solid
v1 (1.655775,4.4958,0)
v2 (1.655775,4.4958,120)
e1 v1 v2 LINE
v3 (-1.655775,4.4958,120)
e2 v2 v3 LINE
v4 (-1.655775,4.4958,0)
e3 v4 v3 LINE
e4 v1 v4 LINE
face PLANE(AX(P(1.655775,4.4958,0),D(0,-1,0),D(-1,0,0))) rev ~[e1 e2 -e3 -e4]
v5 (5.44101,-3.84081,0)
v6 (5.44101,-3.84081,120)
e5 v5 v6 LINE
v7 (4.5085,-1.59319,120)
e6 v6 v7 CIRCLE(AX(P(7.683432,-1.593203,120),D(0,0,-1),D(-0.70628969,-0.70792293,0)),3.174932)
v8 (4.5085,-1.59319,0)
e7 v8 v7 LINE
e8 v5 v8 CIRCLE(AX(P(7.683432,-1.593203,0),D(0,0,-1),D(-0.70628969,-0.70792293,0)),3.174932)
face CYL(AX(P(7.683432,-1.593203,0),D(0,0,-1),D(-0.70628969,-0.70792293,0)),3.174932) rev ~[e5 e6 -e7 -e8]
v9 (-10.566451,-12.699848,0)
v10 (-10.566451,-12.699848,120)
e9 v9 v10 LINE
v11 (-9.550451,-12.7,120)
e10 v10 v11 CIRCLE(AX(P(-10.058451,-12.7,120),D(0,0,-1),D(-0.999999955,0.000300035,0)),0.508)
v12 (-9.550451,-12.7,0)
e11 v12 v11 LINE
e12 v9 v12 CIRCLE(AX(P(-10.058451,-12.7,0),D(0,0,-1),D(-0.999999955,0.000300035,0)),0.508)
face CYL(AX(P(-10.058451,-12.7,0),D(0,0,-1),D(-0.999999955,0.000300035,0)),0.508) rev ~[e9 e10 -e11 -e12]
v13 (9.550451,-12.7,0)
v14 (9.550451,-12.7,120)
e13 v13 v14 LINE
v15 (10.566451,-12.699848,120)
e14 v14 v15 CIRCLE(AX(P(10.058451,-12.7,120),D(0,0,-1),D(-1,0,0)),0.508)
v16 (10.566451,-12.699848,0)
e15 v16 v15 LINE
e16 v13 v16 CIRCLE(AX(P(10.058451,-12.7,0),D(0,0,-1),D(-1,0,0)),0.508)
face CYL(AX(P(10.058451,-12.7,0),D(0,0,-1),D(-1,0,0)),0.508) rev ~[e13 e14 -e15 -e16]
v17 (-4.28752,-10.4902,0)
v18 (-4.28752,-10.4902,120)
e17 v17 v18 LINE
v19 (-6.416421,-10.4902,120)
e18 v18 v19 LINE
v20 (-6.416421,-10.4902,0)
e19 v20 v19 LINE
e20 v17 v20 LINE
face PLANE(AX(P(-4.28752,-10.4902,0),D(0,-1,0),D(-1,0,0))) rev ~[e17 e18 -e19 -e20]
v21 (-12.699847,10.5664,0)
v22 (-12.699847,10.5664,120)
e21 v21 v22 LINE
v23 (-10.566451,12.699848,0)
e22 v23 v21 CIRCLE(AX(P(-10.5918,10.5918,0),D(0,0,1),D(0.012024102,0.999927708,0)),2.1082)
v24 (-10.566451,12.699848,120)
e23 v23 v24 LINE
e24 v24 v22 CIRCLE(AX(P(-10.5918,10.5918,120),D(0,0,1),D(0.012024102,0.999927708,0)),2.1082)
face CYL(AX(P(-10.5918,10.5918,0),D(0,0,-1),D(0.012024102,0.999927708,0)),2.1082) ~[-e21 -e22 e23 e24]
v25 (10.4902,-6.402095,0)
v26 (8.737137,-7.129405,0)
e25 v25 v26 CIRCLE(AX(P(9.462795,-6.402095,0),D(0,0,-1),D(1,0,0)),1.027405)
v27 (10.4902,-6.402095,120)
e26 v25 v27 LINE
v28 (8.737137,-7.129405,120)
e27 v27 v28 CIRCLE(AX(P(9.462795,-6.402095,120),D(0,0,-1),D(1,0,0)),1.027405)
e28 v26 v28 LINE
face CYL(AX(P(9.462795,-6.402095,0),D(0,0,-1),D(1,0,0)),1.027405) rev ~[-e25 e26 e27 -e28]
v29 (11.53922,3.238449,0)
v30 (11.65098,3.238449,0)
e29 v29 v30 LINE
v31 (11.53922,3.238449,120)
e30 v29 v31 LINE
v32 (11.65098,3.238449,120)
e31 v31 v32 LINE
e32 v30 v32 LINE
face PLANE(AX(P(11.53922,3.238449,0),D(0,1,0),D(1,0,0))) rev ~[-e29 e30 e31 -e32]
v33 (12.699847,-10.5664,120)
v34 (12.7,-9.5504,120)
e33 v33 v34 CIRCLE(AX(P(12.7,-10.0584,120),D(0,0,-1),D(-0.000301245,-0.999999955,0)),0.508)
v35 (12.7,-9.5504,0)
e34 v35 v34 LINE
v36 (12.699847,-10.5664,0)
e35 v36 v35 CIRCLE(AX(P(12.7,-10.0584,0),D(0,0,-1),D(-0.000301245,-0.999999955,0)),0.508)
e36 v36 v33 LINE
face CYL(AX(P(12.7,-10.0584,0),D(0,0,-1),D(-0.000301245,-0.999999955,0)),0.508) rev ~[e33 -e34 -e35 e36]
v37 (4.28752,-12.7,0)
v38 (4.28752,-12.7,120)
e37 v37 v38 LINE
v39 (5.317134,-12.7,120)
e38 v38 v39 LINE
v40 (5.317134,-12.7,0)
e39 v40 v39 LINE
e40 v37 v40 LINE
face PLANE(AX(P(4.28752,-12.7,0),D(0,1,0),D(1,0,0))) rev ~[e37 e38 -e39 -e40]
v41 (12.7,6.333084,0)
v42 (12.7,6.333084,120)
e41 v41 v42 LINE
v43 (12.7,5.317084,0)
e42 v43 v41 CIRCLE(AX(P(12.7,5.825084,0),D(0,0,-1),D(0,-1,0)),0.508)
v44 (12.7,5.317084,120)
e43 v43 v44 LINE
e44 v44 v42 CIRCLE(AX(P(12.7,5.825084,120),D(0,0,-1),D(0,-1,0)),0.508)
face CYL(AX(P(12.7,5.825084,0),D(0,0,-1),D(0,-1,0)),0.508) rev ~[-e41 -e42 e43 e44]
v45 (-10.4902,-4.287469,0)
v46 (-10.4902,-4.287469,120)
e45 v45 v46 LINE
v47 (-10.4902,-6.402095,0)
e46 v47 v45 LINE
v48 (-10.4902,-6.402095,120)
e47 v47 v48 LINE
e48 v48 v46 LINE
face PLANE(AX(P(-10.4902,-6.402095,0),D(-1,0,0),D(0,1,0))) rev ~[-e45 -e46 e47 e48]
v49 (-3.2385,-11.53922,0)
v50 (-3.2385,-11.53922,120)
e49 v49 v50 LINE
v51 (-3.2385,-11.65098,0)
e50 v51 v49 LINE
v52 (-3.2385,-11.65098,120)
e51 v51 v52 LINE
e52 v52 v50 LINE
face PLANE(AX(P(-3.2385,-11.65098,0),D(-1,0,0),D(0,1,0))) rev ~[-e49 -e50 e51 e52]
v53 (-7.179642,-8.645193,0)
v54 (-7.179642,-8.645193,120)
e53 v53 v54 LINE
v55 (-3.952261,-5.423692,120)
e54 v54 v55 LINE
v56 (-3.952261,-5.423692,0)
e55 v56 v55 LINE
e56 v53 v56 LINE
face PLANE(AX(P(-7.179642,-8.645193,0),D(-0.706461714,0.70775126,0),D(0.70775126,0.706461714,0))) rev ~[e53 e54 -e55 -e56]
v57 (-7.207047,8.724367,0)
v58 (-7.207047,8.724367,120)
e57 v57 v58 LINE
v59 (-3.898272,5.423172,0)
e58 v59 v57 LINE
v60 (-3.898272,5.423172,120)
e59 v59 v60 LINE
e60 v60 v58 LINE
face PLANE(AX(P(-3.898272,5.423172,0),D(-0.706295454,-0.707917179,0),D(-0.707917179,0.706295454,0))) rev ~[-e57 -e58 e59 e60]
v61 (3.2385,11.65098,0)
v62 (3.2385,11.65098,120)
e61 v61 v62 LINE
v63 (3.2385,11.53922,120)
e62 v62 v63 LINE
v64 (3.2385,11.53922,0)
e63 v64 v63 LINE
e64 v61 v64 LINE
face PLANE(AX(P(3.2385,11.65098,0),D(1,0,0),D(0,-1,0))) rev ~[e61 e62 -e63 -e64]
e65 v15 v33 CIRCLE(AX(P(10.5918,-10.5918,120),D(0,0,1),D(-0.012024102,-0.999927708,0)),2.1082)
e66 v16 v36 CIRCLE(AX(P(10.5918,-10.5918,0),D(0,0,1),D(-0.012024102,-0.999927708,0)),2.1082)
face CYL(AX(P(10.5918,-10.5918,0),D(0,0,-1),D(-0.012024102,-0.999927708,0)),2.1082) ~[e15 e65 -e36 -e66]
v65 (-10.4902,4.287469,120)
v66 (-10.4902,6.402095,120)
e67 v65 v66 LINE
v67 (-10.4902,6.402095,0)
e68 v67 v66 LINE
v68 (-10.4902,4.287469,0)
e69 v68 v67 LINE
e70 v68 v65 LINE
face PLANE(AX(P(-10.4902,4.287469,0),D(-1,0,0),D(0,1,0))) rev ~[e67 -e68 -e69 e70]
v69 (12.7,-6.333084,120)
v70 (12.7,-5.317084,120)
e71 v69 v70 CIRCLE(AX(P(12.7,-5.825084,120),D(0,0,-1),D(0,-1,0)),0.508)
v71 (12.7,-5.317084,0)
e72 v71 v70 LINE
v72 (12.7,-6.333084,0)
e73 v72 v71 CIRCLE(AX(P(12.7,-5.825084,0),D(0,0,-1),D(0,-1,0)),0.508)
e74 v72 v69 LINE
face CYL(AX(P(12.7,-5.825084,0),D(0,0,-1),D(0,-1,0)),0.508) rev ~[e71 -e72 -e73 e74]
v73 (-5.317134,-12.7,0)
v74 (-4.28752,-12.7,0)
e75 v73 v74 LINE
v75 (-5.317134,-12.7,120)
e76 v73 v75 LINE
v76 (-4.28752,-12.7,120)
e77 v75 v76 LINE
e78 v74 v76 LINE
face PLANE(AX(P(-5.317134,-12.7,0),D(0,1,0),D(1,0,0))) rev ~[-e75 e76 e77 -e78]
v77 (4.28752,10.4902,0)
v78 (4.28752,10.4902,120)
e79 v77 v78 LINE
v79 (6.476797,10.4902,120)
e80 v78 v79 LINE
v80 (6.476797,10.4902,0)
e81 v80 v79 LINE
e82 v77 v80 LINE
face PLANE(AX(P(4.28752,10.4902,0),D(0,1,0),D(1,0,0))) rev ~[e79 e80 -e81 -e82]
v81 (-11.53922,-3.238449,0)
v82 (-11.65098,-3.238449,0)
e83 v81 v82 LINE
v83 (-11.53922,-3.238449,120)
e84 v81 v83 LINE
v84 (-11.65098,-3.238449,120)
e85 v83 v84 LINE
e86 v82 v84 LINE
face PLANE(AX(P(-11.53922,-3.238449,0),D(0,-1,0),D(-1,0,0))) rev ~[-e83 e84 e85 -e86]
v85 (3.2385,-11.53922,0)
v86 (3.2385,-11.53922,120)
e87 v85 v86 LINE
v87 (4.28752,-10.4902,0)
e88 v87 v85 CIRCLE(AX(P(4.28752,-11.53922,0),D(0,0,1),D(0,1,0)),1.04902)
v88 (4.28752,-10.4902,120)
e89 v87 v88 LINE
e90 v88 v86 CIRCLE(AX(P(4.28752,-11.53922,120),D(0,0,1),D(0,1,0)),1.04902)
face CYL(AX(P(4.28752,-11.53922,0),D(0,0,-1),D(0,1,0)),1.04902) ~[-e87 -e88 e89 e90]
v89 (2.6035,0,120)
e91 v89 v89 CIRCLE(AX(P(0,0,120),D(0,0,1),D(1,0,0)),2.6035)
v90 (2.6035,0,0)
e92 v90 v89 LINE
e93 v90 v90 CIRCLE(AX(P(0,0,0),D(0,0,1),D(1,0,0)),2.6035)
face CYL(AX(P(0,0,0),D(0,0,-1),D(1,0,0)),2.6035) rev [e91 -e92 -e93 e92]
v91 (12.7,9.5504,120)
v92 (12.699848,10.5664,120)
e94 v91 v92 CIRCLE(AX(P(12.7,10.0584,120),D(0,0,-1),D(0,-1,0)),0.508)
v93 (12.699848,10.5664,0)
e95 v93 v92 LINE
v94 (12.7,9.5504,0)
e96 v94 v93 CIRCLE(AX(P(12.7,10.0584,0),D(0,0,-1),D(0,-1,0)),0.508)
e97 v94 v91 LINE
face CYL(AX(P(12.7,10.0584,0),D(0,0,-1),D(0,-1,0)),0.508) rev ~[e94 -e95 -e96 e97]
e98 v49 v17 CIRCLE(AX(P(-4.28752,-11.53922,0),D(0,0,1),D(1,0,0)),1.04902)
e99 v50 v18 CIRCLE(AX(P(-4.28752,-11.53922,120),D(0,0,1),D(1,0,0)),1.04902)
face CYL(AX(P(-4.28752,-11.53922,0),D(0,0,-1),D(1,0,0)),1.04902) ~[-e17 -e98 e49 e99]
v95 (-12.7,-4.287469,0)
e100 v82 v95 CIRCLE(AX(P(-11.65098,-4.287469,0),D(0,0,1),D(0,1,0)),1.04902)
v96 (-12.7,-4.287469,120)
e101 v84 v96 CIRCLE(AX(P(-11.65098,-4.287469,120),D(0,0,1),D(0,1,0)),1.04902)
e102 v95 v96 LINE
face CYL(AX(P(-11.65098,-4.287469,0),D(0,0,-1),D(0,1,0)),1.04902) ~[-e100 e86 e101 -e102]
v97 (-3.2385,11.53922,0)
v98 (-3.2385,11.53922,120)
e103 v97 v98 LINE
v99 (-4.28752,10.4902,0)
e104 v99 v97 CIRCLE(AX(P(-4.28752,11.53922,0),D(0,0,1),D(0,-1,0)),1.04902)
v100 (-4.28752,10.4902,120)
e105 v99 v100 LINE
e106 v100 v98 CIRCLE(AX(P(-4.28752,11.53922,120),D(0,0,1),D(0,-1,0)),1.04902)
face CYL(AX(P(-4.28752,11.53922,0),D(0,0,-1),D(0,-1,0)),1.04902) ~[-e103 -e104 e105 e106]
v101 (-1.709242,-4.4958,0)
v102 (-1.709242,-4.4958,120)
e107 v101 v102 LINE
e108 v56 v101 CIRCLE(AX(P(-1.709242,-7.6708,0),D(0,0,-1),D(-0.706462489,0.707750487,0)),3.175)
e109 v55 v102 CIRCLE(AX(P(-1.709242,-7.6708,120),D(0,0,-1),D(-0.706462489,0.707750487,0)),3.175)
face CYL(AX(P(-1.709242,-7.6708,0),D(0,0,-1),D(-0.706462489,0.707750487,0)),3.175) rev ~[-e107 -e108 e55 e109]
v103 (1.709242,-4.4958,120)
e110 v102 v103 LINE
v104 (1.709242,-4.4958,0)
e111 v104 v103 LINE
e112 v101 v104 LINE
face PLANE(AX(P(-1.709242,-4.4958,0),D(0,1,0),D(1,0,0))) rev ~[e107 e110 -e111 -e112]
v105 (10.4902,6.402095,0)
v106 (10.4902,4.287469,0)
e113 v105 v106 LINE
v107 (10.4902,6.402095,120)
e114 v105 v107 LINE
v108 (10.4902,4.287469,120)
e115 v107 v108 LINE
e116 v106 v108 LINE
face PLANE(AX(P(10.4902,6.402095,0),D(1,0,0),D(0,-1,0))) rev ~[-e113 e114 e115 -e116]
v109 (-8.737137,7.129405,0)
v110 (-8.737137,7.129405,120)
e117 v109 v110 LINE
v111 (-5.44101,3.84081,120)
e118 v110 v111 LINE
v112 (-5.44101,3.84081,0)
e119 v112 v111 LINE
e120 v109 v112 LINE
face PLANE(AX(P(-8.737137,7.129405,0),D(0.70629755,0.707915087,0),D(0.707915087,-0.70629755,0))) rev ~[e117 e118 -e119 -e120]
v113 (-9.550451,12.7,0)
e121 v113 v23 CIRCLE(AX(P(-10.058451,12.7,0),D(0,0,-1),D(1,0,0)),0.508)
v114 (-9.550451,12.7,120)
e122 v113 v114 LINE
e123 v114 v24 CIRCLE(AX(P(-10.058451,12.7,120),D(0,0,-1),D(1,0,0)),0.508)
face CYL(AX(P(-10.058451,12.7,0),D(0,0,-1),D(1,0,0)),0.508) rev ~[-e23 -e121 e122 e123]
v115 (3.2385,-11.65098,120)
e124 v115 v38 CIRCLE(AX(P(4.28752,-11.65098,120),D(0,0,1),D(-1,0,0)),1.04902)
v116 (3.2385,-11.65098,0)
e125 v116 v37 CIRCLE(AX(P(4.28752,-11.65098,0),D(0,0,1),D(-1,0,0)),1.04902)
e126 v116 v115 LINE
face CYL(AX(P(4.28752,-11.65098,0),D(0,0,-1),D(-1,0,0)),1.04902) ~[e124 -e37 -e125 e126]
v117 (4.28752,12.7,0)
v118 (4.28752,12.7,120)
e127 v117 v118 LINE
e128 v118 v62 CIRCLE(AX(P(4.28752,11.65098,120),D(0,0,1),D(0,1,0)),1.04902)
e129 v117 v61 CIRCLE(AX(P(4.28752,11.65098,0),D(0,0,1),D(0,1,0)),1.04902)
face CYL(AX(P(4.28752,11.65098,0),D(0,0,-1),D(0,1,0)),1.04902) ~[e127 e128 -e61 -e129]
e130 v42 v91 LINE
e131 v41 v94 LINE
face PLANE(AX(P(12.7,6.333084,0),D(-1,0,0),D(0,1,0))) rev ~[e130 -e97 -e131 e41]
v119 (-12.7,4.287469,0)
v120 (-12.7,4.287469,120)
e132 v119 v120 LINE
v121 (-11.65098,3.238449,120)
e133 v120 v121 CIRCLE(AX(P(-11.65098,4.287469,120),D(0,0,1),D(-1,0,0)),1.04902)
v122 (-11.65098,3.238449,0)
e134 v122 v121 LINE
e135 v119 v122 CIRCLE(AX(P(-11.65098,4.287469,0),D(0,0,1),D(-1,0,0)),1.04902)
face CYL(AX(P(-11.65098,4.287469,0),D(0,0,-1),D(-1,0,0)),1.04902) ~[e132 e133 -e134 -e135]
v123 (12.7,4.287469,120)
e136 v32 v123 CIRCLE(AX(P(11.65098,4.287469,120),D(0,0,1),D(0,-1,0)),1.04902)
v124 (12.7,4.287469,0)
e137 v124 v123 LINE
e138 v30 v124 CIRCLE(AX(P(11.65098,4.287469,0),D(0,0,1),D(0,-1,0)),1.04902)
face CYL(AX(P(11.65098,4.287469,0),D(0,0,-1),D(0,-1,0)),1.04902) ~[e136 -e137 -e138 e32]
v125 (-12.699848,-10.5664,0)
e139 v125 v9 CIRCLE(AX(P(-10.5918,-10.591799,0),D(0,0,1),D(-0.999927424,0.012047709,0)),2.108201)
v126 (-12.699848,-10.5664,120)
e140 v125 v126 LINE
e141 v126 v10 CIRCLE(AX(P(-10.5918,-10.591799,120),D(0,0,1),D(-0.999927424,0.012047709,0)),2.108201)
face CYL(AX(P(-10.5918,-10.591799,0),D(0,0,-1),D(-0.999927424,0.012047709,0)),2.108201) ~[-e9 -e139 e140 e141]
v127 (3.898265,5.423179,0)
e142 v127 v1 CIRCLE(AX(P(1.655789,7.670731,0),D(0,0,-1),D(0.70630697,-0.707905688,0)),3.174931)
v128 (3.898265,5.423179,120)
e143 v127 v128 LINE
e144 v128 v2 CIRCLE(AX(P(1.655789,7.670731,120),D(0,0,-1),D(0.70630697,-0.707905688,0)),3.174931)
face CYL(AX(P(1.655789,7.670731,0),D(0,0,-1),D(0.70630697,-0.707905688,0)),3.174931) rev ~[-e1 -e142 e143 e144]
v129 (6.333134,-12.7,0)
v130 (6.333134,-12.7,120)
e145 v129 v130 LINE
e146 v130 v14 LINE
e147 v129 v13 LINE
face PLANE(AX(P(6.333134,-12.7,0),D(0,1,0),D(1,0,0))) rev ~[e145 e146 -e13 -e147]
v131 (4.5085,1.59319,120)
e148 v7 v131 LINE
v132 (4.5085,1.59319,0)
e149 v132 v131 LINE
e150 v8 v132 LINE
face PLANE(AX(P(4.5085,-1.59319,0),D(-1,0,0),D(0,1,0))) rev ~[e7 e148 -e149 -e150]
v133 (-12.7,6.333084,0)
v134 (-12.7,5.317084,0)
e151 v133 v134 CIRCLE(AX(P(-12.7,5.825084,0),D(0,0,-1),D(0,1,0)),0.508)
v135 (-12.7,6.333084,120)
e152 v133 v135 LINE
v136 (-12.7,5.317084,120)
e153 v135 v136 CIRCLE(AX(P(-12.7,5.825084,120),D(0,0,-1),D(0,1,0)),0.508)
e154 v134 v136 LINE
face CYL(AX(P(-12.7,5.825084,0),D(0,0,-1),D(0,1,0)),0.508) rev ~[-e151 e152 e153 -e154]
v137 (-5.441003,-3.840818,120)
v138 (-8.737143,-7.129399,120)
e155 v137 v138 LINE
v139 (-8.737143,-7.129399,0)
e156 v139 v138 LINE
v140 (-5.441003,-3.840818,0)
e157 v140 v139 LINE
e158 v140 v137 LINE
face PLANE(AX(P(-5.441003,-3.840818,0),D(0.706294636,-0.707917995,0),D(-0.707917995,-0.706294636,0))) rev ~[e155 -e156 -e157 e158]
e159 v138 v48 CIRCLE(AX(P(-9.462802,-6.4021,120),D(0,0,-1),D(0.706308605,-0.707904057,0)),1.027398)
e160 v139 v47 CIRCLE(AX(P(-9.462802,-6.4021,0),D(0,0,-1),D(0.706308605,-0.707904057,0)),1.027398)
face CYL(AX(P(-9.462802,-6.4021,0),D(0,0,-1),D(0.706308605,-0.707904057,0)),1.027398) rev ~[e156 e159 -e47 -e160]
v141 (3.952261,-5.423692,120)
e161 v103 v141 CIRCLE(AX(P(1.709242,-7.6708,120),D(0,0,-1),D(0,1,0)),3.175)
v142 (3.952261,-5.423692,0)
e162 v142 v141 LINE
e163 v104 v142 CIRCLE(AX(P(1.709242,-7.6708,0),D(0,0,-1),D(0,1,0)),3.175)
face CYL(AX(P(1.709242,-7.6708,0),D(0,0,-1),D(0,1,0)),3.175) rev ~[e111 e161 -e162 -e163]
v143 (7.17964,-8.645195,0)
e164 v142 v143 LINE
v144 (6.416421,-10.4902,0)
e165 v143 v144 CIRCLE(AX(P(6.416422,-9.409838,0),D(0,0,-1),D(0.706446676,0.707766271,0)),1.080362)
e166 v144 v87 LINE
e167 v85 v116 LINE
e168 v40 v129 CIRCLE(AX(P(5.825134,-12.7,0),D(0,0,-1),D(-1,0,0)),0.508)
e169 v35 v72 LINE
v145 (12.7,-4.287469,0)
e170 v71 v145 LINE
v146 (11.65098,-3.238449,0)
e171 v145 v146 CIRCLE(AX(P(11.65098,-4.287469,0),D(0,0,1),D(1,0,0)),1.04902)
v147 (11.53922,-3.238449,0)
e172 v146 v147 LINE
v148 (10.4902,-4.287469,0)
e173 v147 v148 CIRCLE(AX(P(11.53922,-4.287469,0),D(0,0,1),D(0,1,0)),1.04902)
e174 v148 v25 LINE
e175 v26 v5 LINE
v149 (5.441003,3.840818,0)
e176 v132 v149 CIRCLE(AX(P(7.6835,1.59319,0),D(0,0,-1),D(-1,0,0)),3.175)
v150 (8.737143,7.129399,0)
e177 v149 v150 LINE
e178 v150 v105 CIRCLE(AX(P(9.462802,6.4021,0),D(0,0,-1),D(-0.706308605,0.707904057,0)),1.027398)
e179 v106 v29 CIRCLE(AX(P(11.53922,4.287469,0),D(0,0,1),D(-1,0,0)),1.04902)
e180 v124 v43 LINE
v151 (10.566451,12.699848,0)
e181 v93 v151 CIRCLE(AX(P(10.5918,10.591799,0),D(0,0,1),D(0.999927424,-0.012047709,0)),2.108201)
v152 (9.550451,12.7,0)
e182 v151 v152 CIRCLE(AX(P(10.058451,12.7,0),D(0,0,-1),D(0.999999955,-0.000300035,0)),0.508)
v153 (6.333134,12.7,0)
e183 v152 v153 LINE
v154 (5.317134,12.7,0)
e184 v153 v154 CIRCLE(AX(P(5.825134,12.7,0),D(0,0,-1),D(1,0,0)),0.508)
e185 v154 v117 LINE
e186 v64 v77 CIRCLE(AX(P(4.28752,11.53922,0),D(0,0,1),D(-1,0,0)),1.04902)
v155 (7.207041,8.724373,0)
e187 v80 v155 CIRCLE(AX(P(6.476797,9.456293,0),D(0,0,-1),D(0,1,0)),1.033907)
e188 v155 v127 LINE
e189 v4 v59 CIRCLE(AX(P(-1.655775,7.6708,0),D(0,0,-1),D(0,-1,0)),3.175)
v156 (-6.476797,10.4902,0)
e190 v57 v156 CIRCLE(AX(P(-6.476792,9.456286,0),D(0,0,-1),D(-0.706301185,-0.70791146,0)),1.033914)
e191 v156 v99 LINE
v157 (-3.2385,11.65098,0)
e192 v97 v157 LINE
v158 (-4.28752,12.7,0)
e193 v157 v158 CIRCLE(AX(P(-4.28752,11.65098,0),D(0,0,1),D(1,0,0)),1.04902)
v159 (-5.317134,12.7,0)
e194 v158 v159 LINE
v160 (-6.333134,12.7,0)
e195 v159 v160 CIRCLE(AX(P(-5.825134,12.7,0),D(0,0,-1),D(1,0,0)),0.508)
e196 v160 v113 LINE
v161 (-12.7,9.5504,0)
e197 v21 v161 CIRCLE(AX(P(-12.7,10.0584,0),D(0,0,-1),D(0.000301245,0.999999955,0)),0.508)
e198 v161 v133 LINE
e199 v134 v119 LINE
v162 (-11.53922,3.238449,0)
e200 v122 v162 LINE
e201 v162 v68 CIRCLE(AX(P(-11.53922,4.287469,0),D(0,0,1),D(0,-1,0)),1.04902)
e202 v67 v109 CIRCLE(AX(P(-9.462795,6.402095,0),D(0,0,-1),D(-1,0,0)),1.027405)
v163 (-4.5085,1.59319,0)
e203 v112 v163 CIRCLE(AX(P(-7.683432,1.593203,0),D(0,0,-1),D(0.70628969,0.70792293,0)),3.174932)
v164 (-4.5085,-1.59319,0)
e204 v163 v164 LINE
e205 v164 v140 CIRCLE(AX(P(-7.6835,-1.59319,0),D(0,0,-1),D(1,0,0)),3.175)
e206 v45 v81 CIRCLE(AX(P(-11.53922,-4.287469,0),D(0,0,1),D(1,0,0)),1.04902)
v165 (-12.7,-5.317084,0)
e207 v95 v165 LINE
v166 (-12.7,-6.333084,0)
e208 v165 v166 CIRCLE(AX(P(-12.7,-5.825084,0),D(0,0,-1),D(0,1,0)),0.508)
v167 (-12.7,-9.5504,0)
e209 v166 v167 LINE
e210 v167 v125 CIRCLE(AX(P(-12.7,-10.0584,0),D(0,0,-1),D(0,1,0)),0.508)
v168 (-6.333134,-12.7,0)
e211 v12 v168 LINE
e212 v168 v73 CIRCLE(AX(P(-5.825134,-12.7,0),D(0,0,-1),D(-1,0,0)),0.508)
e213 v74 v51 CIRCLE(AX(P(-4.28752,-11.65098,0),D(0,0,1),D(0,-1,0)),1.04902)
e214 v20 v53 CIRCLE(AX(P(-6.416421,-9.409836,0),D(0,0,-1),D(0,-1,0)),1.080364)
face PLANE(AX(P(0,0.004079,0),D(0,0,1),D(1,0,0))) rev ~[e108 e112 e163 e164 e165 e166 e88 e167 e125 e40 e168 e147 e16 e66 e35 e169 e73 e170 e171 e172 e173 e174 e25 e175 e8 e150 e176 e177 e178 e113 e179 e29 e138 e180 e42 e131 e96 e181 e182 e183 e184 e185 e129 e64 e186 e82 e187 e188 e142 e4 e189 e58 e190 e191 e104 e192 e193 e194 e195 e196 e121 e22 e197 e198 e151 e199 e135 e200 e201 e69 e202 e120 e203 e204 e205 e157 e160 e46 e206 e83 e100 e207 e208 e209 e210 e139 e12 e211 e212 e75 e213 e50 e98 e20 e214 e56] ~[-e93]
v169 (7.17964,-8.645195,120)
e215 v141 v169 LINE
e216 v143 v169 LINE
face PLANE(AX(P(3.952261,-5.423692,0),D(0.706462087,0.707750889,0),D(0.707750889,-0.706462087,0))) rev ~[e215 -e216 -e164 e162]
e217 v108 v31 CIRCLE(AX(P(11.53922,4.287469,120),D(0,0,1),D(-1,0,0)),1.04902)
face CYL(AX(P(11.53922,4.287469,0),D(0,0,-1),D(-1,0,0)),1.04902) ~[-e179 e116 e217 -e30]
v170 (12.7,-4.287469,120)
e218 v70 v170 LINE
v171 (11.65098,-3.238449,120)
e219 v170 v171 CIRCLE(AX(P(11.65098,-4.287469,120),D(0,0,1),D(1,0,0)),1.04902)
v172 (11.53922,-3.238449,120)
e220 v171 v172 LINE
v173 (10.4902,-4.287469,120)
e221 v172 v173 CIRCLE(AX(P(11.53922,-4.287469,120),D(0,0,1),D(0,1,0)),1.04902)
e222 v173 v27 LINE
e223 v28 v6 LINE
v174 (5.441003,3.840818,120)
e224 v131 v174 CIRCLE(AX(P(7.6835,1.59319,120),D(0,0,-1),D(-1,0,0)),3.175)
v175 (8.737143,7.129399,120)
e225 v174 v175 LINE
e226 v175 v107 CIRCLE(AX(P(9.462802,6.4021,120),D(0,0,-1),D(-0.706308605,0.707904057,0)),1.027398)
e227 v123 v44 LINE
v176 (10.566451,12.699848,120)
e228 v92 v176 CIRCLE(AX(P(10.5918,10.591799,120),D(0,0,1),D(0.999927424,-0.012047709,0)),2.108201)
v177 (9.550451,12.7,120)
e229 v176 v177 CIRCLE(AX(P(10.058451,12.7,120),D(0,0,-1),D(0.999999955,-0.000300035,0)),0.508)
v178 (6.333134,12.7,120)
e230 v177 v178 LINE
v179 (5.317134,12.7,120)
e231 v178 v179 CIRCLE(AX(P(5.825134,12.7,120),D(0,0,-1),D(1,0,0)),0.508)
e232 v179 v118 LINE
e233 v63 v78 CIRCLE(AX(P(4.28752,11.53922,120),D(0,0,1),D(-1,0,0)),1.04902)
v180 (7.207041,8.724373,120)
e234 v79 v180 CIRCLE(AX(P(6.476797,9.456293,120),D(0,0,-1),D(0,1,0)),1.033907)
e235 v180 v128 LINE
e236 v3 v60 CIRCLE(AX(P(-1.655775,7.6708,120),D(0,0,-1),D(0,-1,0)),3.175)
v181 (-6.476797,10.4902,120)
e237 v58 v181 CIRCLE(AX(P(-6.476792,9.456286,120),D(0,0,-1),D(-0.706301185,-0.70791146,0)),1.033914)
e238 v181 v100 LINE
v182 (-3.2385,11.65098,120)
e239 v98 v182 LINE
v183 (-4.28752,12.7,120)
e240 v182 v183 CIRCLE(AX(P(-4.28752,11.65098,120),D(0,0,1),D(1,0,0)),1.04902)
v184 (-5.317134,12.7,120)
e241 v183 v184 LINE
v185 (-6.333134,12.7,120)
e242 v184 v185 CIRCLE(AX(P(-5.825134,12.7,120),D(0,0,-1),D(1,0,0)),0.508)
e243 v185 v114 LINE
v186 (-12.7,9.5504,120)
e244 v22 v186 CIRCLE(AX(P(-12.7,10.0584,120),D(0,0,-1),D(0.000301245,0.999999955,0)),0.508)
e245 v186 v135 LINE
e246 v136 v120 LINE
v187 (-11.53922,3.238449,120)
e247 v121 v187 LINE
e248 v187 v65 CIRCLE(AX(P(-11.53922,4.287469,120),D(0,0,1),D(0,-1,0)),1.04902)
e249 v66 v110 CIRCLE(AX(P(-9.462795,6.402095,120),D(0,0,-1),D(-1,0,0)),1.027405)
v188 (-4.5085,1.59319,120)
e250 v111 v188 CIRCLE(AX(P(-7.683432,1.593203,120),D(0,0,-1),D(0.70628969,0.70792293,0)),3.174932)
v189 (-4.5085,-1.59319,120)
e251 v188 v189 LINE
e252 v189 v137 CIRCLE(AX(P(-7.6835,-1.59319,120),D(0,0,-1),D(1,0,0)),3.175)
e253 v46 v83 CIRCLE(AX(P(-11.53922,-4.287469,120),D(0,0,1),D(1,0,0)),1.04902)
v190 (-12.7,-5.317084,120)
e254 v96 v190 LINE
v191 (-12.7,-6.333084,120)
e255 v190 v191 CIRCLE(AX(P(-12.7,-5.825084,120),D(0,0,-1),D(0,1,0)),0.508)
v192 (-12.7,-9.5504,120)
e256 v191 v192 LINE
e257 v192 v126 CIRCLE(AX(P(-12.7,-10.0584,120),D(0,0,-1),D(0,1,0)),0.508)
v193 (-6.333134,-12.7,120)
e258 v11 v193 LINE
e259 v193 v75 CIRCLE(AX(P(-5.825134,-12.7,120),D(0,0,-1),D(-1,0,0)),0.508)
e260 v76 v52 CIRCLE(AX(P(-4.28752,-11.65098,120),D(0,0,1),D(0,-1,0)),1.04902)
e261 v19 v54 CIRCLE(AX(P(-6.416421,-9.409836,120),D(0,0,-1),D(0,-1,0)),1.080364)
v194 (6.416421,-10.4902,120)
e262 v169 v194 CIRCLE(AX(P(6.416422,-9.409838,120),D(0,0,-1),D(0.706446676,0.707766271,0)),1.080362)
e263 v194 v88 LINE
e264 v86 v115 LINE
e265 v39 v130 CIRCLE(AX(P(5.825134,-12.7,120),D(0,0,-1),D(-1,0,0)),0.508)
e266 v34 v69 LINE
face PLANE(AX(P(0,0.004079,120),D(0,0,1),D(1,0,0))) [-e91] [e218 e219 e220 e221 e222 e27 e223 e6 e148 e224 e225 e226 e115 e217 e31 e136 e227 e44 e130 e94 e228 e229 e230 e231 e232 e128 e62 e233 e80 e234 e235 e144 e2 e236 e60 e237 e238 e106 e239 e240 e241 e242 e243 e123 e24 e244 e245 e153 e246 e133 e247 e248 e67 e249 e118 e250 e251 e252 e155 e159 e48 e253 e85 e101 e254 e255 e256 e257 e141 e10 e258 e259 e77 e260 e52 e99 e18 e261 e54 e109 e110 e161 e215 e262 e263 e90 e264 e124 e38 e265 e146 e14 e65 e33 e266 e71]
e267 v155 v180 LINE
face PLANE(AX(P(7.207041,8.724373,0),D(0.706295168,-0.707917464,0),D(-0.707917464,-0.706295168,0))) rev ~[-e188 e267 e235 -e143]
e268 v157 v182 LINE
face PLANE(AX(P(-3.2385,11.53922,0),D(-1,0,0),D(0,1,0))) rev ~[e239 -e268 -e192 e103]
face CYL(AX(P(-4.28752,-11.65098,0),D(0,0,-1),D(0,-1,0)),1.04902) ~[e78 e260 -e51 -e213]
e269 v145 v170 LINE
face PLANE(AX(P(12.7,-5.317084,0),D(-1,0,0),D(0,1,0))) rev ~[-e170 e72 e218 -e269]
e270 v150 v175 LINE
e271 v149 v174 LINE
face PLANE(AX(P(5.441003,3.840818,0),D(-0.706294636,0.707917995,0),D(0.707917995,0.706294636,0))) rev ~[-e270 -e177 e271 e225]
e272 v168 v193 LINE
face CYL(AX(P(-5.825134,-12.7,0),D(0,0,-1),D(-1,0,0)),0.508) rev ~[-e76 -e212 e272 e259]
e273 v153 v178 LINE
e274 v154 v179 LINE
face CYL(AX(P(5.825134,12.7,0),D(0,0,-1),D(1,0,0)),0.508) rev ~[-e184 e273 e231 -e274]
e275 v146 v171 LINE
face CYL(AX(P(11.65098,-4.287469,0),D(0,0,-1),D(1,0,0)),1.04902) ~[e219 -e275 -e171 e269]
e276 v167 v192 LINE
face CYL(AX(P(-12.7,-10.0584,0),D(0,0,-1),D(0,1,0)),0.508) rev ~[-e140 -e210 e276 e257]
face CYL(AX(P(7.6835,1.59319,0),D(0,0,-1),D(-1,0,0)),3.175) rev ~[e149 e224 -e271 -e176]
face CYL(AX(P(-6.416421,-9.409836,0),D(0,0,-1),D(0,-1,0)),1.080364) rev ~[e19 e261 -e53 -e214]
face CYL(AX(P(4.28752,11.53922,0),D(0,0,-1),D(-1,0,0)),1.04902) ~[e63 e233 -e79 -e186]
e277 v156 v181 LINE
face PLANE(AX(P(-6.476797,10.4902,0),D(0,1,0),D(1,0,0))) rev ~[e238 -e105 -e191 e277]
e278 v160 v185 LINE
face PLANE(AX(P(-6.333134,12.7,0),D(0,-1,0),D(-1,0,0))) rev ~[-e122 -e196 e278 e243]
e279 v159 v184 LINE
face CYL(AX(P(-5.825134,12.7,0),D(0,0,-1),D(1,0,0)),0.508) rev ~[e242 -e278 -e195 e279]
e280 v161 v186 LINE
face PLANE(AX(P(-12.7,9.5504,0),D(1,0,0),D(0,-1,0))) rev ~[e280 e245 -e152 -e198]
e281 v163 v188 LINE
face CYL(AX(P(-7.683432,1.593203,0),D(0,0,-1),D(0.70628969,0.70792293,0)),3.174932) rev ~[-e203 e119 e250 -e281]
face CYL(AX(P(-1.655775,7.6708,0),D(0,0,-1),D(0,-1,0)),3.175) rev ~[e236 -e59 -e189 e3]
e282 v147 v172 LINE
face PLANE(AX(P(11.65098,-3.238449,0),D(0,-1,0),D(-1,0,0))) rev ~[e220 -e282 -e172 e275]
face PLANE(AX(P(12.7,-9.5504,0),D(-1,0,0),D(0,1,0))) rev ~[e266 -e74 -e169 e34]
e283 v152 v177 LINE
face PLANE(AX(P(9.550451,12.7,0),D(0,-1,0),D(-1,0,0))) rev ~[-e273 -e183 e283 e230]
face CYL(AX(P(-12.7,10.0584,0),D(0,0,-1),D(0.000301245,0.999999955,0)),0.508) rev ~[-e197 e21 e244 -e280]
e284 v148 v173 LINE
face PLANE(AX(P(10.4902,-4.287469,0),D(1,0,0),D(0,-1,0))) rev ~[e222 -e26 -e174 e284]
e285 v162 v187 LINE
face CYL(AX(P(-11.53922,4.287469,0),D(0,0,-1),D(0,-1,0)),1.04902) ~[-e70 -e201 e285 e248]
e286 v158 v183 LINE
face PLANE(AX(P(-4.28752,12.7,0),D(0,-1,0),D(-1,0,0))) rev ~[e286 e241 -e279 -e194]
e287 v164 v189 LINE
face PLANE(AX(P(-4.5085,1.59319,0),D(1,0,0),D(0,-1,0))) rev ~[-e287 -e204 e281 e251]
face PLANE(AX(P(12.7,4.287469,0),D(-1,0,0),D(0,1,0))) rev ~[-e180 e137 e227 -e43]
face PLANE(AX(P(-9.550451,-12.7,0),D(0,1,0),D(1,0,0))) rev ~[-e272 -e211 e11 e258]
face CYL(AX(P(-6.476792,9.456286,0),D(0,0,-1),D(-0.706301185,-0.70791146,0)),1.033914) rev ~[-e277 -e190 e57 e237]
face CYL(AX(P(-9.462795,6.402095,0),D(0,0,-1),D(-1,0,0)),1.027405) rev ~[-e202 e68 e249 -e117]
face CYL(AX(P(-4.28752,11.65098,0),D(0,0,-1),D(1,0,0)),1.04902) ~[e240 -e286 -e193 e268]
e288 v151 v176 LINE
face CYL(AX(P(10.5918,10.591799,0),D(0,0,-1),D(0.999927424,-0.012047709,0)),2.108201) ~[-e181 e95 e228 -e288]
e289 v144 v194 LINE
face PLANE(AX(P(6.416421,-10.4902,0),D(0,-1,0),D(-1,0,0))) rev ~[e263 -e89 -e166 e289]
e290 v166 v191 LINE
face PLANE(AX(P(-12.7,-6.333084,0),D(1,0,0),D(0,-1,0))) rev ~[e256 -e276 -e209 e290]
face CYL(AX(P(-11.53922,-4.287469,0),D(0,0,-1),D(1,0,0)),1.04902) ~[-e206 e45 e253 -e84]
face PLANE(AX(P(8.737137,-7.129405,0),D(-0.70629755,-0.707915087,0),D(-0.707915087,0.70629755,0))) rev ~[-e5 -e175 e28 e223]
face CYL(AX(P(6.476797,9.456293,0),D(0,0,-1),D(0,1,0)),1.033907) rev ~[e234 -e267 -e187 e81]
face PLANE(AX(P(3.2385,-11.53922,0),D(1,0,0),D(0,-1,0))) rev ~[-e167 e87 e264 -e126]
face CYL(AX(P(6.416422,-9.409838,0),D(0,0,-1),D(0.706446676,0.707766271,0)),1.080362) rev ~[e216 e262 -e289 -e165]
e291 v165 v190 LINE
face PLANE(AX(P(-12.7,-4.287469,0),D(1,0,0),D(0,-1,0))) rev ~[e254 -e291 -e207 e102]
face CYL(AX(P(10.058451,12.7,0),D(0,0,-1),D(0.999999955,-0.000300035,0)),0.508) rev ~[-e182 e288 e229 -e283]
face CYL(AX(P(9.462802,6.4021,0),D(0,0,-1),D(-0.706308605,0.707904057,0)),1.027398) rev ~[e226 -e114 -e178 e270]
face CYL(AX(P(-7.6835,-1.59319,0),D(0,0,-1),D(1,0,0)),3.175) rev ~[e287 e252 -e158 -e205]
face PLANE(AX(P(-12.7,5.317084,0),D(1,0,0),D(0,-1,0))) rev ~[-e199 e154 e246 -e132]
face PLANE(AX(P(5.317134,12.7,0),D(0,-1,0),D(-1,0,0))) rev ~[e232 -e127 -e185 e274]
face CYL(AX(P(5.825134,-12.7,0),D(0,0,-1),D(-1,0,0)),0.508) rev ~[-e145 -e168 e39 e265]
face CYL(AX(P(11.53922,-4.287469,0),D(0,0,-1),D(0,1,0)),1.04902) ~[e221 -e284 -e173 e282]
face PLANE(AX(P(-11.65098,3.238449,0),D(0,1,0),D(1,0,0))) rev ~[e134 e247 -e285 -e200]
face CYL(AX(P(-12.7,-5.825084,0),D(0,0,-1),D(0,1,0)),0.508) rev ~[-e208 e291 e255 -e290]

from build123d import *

# Parameters (mm, degrees)
F0_R     = 2.6035
F1_DEPTH = 120


# Not quite as in the source:
# - ends of sketch curves that miss each other by under 0.0002 mm in the source are joined


with BuildPart() as f1:
    # F0 (on Top) → F1 (new body)
    with BuildSketch(Plane.XY):
        with BuildLine():
            ThreePointArc((-3.9522606035, -5.4236922052), (-2.9229262099, -4.7369294977), (-1.7092422, -4.4958))
            Line((-1.7092422, -4.4958), (1.7092422, -4.4958))
            ThreePointArc((1.7092422, -4.4958), (2.9229262099, -4.7369294977), (3.9522606035, -5.4236922052))
            Line((3.9522606035, -5.4236922052), (7.1796402, -8.6451948))
            ThreePointArc((7.1796402, -8.6451948), (7.4147391594, -9.822808991), (6.416421, -10.4902))
            Line((6.416421, -10.4902), (4.28752, -10.4902))
            ThreePointArc((4.28752, -10.4902), (3.5457508444, -10.7974508444), (3.2385, -11.53922))
            Line((3.2385, -11.53922), (3.2385, -11.65098))
            ThreePointArc((3.2385, -11.65098), (3.5457508444, -12.3927491556), (4.28752, -12.7))
            Line((4.28752, -12.7), (5.3171344, -12.7))
            ThreePointArc((5.3171344, -12.7), (5.8251344, -12.192), (6.3331344, -12.7))
            Line((6.3331344, -12.7), (9.5504508, -12.7))
            ThreePointArc((9.5504508, -12.7), (10.0583746, -12.1920000057), (10.5664507771, -12.6998476))
            ThreePointArc((10.5664507771, -12.6998476), (12.0825404752, -12.0825045568), (12.6998469825, -10.5664000074))
            ThreePointArc((12.6998469825, -10.5664000074), (12.1920000057, -10.0583238), (12.7, -9.5504))
            Line((12.7, -9.5504), (12.7, -6.3330836))
            ThreePointArc((12.7, -6.3330836), (12.192, -5.8250836), (12.7, -5.3170836))
            Line((12.7, -5.3170836), (12.7, -4.2874692))
            ThreePointArc((12.7, -4.2874692), (12.3927491556, -3.5457000444), (11.65098, -3.2384492))
            Line((11.65098, -3.2384492), (11.53922, -3.2384492))
            ThreePointArc((11.53922, -3.2384492), (10.7974508444, -3.5457000444), (10.4902, -4.2874692))
            Line((10.4902, -4.2874692), (10.4902, -6.4020954))
            ThreePointArc((10.4902, -6.4020954), (9.8565053438, -7.3510699477), (8.7371366164, -7.1294051977))
            Line((8.7371366164, -7.1294051977), (5.4410102, -3.8408102))
            ThreePointArc((5.4410102, -3.8408102), (4.7508771577, -2.8098852335), (4.5085, -1.5931896))
            Line((4.5085, -1.5931896), (4.5085, 1.5931896))
            ThreePointArc((4.5085, 1.5931896), (4.7508771577, 2.8098852335), (5.4410028439, 3.840817573))
            Line((5.4410028439, 3.840817573), (8.7371428, 7.129399))
            ThreePointArc((8.7371428, 7.129399), (9.8565053438, 7.3510699477), (10.4902, 6.4020954))
            Line((10.4902, 6.4020954), (10.4902, 4.2874692))
            ThreePointArc((10.4902, 4.2874692), (10.7974508444, 3.5457000444), (11.53922, 3.2384492))
            Line((11.53922, 3.2384492), (11.65098, 3.2384492))
            ThreePointArc((11.65098, 3.2384492), (12.3927491556, 3.5457000444), (12.7, 4.2874692))
            Line((12.7, 4.2874692), (12.7, 5.3170836))
            ThreePointArc((12.7, 5.3170836), (12.192, 5.8250836), (12.7, 6.3330836))
            Line((12.7, 6.3330836), (12.7, 9.5504))
            ThreePointArc((12.7, 9.5504), (12.1920000057, 10.0583238), (12.6998476, 10.5663999771))
            ThreePointArc((12.6998476, 10.5663999771), (12.0825404752, 12.0825045568), (10.5664508001, 12.6998475939))
            ThreePointArc((10.5664508001, 12.6998475939), (10.0583746, 12.1920000057), (9.5504508, 12.7))
            Line((9.5504508, 12.7), (6.3331344, 12.7))
            ThreePointArc((6.3331344, 12.7), (5.8251344, 12.192), (5.3171344, 12.7))
            Line((5.3171344, 12.7), (4.28752, 12.7))
            ThreePointArc((4.28752, 12.7), (3.5457508444, 12.3927491556), (3.2385, 11.65098))
            Line((3.2385, 11.65098), (3.2385, 11.53922))
            ThreePointArc((3.2385, 11.53922), (3.5457508444, 10.7974508444), (4.28752, 10.4902))
            Line((4.28752, 10.4902), (6.4767968, 10.4902))
            ThreePointArc((6.4767968, 10.4902), (7.4322289723, 9.8514044384), (7.2070407772, 8.7243726366))
            Line((7.2070407772, 8.7243726366), (3.898265, 5.4231794))
            ThreePointArc((3.898265, 5.4231794), (2.8691189654, 4.7367887684), (1.6557752, 4.4958))
            Line((1.6557752, 4.4958), (-1.6557752, 4.4958))
            ThreePointArc((-1.6557752, 4.4958), (-2.8691189654, 4.7367887684), (-3.8982723561, 5.423172027))
            Line((-3.8982723561, 5.423172027), (-7.2070468, 8.7243666))
            ThreePointArc((-7.2070468, 8.7243666), (-7.4322289723, 9.8514044384), (-6.4767968, 10.4902))
            Line((-6.4767968, 10.4902), (-4.28752, 10.4902))
            ThreePointArc((-4.28752, 10.4902), (-3.5457508444, 10.7974508444), (-3.2385, 11.53922))
            Line((-3.2385, 11.53922), (-3.2385, 11.65098))
            ThreePointArc((-3.2385, 11.65098), (-3.5457508444, 12.3927491556), (-4.28752, 12.7))
            Line((-4.28752, 12.7), (-5.3171344, 12.7))
            ThreePointArc((-5.3171344, 12.7), (-5.8251344, 12.192), (-6.3331344, 12.7))
            Line((-6.3331344, 12.7), (-9.5504508, 12.7))
            ThreePointArc((-9.5504508, 12.7), (-10.0583746, 12.1920000057), (-10.5664507771, 12.6998476))
            ThreePointArc((-10.5664507771, 12.6998476), (-12.0825404752, 12.0825045568), (-12.6998469825, 10.5664000074))
            ThreePointArc((-12.6998469825, 10.5664000074), (-12.1920000057, 10.0583238), (-12.7, 9.5504))
            Line((-12.7, 9.5504), (-12.7, 6.3330836))
            ThreePointArc((-12.7, 6.3330836), (-12.192, 5.8250836), (-12.7, 5.3170836))
            Line((-12.7, 5.3170836), (-12.7, 4.2874692))
            ThreePointArc((-12.7, 4.2874692), (-12.3927491556, 3.5457000444), (-11.65098, 3.2384492))
            Line((-11.65098, 3.2384492), (-11.53922, 3.2384492))
            ThreePointArc((-11.53922, 3.2384492), (-10.7974508444, 3.5457000444), (-10.4902, 4.2874692))
            Line((-10.4902, 4.2874692), (-10.4902, 6.4020954))
            ThreePointArc((-10.4902, 6.4020954), (-9.8565053438, 7.3510699477), (-8.7371366164, 7.1294051977))
            Line((-8.7371366164, 7.1294051977), (-5.4410102, 3.8408102))
            ThreePointArc((-5.4410102, 3.8408102), (-4.7508771577, 2.8098852335), (-4.5085, 1.5931896))
            Line((-4.5085, 1.5931896), (-4.5085, -1.5931896))
            ThreePointArc((-4.5085, -1.5931896), (-4.7508771577, -2.8098852335), (-5.4410028439, -3.840817573))
            Line((-5.4410028439, -3.840817573), (-8.7371428, -7.129399))
            ThreePointArc((-8.7371428, -7.129399), (-9.8565053438, -7.3510699477), (-10.4902, -6.4020954))
            Line((-10.4902, -6.4020954), (-10.4902, -4.2874692))
            ThreePointArc((-10.4902, -4.2874692), (-10.7974508444, -3.5457000444), (-11.53922, -3.2384492))
            Line((-11.53922, -3.2384492), (-11.65098, -3.2384492))
            ThreePointArc((-11.65098, -3.2384492), (-12.3927491556, -3.5457000444), (-12.7, -4.2874692))
            Line((-12.7, -4.2874692), (-12.7, -5.3170836))
            ThreePointArc((-12.7, -5.3170836), (-12.192, -5.8250836), (-12.7, -6.3330836))
            Line((-12.7, -6.3330836), (-12.7, -9.5504))
            ThreePointArc((-12.7, -9.5504), (-12.1920000057, -10.0583238), (-12.6998476, -10.5663999771))
            ThreePointArc((-12.6998476, -10.5663999771), (-12.0825404752, -12.0825045568), (-10.5664508001, -12.6998475939))
            ThreePointArc((-10.5664508001, -12.6998475939), (-10.0583746, -12.1920000057), (-9.5504508, -12.7))
            Line((-9.5504508, -12.7), (-6.3331344, -12.7))
            ThreePointArc((-6.3331344, -12.7), (-5.8251344, -12.192), (-5.3171344, -12.7))
            Line((-5.3171344, -12.7), (-4.28752, -12.7))
            ThreePointArc((-4.28752, -12.7), (-3.5457508444, -12.3927491556), (-3.2385, -11.65098))
            Line((-3.2385, -11.65098), (-3.2385, -11.53922))
            ThreePointArc((-3.2385, -11.53922), (-3.5457508444, -10.7974508444), (-4.28752, -10.4902))
            Line((-4.28752, -10.4902), (-6.416421, -10.4902))
            ThreePointArc((-6.416421, -10.4902), (-7.4147391594, -9.822808991), (-7.1796418951, -8.6451931018))
            Line((-7.1796418951, -8.6451931018), (-3.9522606035, -5.4236922052))
        make_face()
        Circle(F0_R, mode=Mode.SUBTRACT)
    extrude(amount=F1_DEPTH)


solid = f1.part
